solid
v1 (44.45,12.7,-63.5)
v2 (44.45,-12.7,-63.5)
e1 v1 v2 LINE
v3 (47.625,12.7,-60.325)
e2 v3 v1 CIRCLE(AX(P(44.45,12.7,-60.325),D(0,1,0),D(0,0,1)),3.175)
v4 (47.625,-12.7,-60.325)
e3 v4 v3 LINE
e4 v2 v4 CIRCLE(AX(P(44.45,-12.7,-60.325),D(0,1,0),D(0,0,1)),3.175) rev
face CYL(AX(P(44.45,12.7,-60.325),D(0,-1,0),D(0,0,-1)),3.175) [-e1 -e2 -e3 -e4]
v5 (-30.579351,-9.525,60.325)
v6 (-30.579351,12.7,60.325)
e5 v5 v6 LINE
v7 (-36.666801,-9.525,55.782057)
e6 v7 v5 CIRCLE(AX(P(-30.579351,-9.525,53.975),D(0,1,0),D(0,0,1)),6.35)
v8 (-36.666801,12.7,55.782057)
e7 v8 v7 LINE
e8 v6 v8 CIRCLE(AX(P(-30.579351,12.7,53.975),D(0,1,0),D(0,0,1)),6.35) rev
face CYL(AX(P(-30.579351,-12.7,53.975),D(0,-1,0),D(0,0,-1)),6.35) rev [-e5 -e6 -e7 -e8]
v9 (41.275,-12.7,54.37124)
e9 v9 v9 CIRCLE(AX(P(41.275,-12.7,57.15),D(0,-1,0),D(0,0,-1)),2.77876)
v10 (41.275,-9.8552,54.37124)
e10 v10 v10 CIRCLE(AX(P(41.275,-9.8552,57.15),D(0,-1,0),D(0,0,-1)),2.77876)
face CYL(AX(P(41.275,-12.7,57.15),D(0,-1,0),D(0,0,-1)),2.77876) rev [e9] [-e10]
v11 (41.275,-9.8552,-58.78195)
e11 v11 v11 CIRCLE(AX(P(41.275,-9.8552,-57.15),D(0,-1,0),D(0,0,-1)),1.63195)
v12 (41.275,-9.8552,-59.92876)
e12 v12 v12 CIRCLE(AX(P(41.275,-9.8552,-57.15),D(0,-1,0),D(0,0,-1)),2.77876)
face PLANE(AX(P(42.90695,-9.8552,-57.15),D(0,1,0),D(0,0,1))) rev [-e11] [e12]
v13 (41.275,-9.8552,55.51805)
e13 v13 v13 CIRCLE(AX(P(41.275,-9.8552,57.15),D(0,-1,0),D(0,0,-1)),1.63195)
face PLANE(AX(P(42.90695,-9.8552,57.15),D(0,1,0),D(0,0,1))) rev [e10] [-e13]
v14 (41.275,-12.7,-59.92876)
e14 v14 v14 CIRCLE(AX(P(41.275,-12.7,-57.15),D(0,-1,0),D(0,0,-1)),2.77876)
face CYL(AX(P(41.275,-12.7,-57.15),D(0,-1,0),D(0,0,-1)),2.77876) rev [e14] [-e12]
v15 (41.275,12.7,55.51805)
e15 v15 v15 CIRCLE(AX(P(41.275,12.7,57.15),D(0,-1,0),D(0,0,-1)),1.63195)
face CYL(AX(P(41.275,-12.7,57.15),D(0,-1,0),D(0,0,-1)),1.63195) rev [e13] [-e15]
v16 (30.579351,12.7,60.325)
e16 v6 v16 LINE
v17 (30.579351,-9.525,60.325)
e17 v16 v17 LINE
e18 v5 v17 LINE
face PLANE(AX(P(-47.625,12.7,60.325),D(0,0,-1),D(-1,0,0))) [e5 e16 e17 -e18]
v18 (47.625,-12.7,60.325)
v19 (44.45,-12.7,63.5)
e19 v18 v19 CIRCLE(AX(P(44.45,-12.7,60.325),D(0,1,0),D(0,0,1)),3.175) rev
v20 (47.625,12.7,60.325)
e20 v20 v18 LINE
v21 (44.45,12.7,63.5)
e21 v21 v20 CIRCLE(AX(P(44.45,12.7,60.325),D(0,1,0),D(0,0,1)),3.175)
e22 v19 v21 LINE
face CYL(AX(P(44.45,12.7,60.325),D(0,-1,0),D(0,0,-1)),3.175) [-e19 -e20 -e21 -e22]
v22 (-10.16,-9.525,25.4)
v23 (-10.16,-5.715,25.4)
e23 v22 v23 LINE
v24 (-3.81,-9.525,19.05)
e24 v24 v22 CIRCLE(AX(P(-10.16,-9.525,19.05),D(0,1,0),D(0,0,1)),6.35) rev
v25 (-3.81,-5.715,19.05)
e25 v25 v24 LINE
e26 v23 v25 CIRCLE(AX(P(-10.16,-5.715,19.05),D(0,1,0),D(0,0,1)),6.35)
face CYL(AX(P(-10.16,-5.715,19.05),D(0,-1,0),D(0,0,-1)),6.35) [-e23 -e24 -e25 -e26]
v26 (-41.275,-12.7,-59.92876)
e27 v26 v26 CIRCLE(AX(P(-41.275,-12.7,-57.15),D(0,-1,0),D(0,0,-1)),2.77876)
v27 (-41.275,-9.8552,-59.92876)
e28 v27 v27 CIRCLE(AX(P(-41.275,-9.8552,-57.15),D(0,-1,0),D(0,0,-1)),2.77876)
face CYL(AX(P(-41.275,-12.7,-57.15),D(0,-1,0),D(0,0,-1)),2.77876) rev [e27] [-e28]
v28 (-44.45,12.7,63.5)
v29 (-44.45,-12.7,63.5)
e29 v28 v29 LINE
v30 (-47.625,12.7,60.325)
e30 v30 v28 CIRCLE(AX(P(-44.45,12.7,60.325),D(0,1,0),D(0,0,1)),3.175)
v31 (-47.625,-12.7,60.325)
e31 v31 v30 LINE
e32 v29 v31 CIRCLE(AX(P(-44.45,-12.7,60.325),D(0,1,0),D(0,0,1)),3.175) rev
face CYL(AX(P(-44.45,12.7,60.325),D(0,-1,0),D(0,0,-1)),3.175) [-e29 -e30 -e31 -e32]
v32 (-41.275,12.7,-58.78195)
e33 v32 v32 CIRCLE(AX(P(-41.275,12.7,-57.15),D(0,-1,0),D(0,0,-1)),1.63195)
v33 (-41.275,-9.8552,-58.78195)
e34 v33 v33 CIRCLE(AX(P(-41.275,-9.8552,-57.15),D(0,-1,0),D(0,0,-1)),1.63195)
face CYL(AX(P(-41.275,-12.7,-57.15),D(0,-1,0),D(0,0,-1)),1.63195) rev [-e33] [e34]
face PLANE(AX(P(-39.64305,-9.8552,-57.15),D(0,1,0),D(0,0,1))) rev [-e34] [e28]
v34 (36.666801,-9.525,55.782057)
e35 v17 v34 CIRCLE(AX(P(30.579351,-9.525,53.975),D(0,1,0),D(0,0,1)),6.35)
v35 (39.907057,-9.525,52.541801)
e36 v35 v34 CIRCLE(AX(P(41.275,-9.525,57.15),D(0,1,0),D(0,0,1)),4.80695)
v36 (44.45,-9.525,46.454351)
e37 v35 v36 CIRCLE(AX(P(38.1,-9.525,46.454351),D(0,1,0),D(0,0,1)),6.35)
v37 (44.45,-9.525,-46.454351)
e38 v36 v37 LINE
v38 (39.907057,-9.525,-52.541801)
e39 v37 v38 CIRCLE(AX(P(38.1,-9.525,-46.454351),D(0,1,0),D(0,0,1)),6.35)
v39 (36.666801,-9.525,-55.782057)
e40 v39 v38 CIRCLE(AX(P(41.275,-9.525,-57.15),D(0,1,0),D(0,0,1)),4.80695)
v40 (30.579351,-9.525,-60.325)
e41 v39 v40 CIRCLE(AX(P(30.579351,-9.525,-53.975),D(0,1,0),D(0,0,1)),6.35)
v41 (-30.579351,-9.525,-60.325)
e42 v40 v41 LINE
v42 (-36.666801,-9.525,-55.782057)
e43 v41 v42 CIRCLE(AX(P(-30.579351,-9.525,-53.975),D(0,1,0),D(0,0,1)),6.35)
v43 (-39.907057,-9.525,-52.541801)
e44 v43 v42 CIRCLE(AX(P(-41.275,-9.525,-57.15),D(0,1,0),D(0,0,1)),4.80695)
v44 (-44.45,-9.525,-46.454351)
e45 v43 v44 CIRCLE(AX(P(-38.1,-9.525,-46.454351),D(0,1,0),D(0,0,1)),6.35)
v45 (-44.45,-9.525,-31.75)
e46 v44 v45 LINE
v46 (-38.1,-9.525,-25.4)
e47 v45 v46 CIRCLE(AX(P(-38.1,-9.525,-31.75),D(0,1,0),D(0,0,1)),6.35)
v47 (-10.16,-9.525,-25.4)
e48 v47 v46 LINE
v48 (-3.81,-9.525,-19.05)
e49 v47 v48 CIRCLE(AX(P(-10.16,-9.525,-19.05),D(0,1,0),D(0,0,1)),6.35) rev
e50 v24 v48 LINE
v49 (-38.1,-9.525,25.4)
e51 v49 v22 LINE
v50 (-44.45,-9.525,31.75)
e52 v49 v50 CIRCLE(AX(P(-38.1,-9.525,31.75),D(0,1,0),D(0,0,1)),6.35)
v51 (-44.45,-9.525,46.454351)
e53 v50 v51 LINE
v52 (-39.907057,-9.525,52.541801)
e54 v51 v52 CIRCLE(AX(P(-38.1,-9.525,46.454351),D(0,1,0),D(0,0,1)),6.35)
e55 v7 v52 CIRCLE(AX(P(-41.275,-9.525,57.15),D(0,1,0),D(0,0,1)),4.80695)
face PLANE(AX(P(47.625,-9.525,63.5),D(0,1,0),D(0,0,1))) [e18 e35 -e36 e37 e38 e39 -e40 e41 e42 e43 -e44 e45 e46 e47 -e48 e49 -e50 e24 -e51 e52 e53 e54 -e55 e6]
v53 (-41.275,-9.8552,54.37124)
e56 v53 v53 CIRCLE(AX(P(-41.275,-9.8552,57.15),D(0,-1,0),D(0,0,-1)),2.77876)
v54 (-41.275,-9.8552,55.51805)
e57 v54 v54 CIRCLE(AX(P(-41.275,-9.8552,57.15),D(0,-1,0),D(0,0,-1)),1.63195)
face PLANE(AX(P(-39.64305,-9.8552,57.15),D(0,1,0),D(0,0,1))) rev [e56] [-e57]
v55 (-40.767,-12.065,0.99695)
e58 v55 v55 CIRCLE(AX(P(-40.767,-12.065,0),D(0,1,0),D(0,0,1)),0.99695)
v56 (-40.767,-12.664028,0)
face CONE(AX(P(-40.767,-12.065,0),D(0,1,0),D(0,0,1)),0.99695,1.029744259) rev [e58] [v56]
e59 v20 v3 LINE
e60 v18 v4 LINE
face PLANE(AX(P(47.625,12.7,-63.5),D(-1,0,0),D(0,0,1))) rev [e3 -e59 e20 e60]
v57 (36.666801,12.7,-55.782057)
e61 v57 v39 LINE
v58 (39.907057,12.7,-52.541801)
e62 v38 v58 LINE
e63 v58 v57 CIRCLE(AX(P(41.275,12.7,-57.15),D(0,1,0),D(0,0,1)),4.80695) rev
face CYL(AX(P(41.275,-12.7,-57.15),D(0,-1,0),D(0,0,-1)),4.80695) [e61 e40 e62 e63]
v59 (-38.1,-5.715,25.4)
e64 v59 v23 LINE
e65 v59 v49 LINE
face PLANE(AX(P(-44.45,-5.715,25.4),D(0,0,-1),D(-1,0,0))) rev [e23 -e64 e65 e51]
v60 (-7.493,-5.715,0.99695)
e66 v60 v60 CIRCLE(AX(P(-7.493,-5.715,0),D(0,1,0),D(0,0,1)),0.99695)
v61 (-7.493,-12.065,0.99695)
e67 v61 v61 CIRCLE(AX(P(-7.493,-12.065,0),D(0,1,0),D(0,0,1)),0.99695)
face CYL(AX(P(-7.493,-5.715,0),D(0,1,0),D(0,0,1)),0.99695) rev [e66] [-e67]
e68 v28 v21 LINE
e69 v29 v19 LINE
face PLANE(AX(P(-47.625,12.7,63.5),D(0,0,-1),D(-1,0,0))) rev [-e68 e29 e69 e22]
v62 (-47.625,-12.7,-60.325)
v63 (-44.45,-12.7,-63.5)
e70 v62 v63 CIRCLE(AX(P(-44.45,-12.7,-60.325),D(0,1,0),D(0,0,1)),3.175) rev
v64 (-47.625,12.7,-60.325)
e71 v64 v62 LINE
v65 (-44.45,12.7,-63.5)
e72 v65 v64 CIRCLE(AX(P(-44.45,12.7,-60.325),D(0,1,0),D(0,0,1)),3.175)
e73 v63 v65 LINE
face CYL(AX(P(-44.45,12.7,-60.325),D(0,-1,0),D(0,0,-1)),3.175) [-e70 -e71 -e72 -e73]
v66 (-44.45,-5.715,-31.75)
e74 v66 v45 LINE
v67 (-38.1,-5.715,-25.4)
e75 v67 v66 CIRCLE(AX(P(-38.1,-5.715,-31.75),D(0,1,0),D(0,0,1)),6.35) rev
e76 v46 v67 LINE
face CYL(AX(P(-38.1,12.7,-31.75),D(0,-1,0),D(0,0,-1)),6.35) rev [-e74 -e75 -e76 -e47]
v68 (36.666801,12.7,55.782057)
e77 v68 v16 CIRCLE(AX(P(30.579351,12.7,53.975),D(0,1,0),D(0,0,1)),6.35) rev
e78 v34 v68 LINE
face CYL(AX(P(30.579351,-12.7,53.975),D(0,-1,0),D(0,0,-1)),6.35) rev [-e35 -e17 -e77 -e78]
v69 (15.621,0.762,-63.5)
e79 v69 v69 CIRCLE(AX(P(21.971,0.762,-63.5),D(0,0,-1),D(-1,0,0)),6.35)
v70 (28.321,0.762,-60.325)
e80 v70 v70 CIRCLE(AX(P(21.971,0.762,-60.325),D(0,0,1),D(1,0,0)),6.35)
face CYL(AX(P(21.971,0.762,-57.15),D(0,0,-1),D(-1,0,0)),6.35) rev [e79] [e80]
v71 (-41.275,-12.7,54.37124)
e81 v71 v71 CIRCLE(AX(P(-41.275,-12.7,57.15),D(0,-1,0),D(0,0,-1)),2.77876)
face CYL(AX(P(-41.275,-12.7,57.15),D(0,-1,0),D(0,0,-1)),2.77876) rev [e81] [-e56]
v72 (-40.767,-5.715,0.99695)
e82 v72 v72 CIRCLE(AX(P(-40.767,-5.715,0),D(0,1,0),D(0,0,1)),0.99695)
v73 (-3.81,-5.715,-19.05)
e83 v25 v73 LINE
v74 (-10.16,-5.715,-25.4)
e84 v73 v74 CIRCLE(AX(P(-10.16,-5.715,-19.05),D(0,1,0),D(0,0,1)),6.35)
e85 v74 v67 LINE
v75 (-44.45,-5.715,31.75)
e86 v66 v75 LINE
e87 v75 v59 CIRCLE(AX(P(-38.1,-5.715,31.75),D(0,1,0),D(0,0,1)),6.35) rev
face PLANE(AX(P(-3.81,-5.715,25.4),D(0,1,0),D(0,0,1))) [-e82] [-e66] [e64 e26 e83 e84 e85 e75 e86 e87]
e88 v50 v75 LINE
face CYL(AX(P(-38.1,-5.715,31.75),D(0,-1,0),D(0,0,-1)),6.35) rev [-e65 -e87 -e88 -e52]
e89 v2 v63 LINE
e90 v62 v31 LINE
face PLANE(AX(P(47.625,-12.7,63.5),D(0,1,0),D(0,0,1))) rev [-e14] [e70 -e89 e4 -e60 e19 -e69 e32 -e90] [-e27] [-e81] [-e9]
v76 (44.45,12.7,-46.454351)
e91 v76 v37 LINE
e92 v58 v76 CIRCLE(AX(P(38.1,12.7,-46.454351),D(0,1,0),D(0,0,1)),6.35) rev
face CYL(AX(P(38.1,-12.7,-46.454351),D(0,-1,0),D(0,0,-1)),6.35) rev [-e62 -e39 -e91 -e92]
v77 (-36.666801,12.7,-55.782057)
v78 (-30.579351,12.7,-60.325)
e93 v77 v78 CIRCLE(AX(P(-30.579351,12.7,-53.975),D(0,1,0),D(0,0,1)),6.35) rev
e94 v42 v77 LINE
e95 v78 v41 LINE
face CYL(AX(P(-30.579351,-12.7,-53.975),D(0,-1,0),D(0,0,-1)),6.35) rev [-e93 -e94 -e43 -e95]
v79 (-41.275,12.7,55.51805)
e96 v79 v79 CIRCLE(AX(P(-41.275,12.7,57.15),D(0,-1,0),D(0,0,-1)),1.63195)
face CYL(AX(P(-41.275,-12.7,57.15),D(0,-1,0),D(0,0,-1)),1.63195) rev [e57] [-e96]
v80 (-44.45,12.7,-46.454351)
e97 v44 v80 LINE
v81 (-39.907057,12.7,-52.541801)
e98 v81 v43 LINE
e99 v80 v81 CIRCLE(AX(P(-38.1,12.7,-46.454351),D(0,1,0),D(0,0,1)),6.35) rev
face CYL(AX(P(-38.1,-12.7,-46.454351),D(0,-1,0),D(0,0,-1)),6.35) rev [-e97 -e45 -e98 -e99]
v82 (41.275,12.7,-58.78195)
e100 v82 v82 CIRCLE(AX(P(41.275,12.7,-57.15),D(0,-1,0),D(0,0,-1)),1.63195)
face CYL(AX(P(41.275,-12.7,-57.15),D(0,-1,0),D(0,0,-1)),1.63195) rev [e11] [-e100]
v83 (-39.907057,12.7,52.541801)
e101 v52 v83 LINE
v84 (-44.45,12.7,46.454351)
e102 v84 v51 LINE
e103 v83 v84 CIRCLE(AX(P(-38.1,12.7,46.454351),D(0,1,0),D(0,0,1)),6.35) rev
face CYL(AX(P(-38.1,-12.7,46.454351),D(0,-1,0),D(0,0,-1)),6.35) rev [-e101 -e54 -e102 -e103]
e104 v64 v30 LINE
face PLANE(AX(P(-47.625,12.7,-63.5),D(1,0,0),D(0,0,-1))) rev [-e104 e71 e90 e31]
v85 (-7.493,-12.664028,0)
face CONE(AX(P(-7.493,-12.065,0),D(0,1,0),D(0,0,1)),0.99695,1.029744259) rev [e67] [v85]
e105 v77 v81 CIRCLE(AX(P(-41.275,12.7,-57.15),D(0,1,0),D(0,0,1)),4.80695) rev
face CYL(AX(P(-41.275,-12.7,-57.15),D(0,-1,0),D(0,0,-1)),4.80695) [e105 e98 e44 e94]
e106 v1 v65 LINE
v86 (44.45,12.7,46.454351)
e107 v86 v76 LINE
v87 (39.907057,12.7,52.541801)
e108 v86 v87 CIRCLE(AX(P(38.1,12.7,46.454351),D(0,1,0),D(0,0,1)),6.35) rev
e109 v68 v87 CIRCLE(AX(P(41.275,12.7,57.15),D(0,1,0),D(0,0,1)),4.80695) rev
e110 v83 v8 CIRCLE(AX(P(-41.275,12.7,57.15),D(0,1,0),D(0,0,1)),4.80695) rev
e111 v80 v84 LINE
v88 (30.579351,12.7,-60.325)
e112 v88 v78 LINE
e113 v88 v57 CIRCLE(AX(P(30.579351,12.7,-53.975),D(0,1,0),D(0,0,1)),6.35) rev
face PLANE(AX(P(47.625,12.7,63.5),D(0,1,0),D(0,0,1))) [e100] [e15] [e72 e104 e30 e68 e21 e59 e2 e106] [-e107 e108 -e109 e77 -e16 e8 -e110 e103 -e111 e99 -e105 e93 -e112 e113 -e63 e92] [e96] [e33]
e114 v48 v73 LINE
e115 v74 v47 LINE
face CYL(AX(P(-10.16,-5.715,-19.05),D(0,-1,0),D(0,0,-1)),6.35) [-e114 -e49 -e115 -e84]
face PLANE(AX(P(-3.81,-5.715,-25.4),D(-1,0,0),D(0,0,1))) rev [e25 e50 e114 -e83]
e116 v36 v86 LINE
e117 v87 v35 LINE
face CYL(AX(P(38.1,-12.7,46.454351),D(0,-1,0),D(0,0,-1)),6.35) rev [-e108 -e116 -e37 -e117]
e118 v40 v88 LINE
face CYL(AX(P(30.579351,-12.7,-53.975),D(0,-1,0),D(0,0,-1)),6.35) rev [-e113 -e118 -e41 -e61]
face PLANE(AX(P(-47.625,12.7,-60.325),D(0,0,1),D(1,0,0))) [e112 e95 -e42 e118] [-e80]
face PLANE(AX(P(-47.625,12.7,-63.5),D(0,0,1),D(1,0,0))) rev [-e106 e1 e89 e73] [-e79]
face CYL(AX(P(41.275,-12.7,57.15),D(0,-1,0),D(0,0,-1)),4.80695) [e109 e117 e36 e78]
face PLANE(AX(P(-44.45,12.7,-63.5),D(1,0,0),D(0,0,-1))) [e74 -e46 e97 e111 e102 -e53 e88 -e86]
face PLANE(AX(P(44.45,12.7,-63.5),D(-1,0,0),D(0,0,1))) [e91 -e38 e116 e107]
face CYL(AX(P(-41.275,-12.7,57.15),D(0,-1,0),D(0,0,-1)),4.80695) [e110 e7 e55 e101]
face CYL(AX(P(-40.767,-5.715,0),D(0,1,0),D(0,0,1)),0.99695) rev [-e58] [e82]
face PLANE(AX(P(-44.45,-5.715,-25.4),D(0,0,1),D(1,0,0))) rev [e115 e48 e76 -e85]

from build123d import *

# Parameters (mm, degrees)
SKETCH1_W                                      = 95.25
SKETCH1_H                                      = 127
BOSS_EXTRUDE1_DEPTH                            = 12.7
FILLET1_R                                      = 3.175
CBORE_FOR_4_SOCKET_HEAD_CAP_SCREW1_D           = 3.2639
CBORE_FOR_4_SOCKET_HEAD_CAP_SCREW1_CBORE_D     = 5.55752
CBORE_FOR_4_SOCKET_HEAD_CAP_SCREW1_CBORE_DEPTH = 2.8448
SHELL1_START                                   = -9.525
SHELL1_DEPTH                                   = 22.225
SHELL1_START_2                                 = -6.6802
SHELL1_2_DEPTH                                 = 19.3802
CUT_EXTRUDE1_START                             = -2.8448
CUT_EXTRUDE1_DEPTH                             = 2.8448
SKETCH7_W                                      = 40.64
SKETCH7_H                                      = 50.8
BOSS_EXTRUDE2_DEPTH                            = 3.81
F_3_48_TAPPED_HOLE1_D                          = 1.9939
F_3_48_TAPPED_HOLE1_DEPTH                      = 6.35
F_3_48_TAPPED_HOLE1_TIP                        = 0.599027994
FILLET4_R                                      = 6.35
FILLET5_R                                      = 6.35
SKETCH12_R                                     = 6.35
CUT_EXTRUDE2_DEPTH                             = 6.35


# Read off the part's stored shape, not the designer's step: Shell1
with BuildPart() as part:
    # Sketch1 → Boss-Extrude1 (new, symmetric)
    with BuildSketch(Plane(origin=(0, 0, 0), x_dir=(1, 0, 0), z_dir=(0, 1, 0))):
        Rectangle(SKETCH1_W, SKETCH1_H)
    extrude(amount=BOSS_EXTRUDE1_DEPTH, both=True)

    # Fillet1
    fillet1_edges = [part.edges().sort_by_distance(p)[0] for p in [
        (47.625, 0, 63.5),
        (-47.625, 0, 63.5),
        (-47.625, 0, -63.5),
        (47.625, 0, -63.5),
    ]]
    fillet(fillet1_edges, radius=FILLET1_R)

    # CBORE for #4 Socket Head Cap Screw1 (through all)
    with Locations(Plane.XZ.offset(12.7)):
        with Locations((-41.275, -57.15), (-41.275, 57.15), (41.275, 57.15), (41.275, -57.15)):
            CounterBoreHole(CBORE_FOR_4_SOCKET_HEAD_CAP_SCREW1_D / 2, CBORE_FOR_4_SOCKET_HEAD_CAP_SCREW1_CBORE_D / 2, CBORE_FOR_4_SOCKET_HEAD_CAP_SCREW1_CBORE_DEPTH)

    # Shell1 outline → Shell1 (cut)
    with BuildSketch(Plane(origin=(0, 0, 0), x_dir=(1, 0, 0), z_dir=(0, 1, 0)).offset(SHELL1_START)):
        with BuildLine():
            Line((36.238470129, 60.325), (-36.238470129, 60.325))
            ThreePointArc((-36.238470129, 60.325), (-37.06505593, 52.94005593), (-44.45, 52.113470129))
            Line((-44.45, 52.113470129), (-44.45, -52.113470129))
            ThreePointArc((-44.45, -52.113470129), (-37.06505593, -52.94005593), (-36.238470129, -60.325))
            Line((-36.238470129, -60.325), (36.238470129, -60.325))
            ThreePointArc((36.238470129, -60.325), (37.06505593, -52.94005593), (44.45, -52.113470129))
            Line((44.45, -52.113470129), (44.45, 52.113470129))
            ThreePointArc((44.45, 52.113470129), (37.06505593, 52.94005593), (36.238470129, 60.325))
        make_face()
    extrude(amount=SHELL1_DEPTH, mode=Mode.SUBTRACT)

    # Shell1 2 outline → Shell1 2 (cut)
    with BuildSketch(Plane(origin=(0, 0, 0), x_dir=(1, 0, 0), z_dir=(0, 1, 0)).offset(SHELL1_START_2)):
        with BuildLine():
            Line((-36.238470129, 60.325), (-37.665825122, 60.325))
            ThreePointArc((-37.665825122, 60.325), (-37.875973058, 53.750973058), (-44.45, 53.540825122))
            Line((-44.45, 53.540825122), (-44.45, 52.113470129))
            ThreePointArc((-44.45, 52.113470129), (-37.06505593, 52.94005593), (-36.238470129, 60.325))
        make_face()
        with BuildLine():
            Line((37.665825122, 60.325), (36.238470129, 60.325))
            ThreePointArc((36.238470129, 60.325), (37.06505593, 52.94005593), (44.45, 52.113470129))
            Line((44.45, 52.113470129), (44.45, 53.540825122))
            ThreePointArc((44.45, 53.540825122), (37.875973058, 53.750973058), (37.665825122, 60.325))
        make_face()
        with BuildLine():
            ThreePointArc((-36.238470129, -60.325), (-37.06505593, -52.94005593), (-44.45, -52.113470129))
            Line((-44.45, -52.113470129), (-44.45, -53.540825122))
            ThreePointArc((-44.45, -53.540825122), (-37.875973058, -53.750973058), (-37.665825122, -60.325))
            Line((-37.665825122, -60.325), (-36.238470129, -60.325))
        make_face()
        with BuildLine():
            Line((44.45, -53.540825122), (44.45, -52.113470129))
            ThreePointArc((44.45, -52.113470129), (37.06505593, -52.94005593), (36.238470129, -60.325))
            Line((36.238470129, -60.325), (37.665825122, -60.325))
            ThreePointArc((37.665825122, -60.325), (37.875973058, -53.750973058), (44.45, -53.540825122))
        make_face()
    extrude(amount=SHELL1_2_DEPTH, mode=Mode.SUBTRACT)

    # Sketch11 → Cut-Extrude1 (cut)
    with BuildSketch(Plane(origin=(0, -6.6802, 0), x_dir=(1, 0, 0), z_dir=(0, 1, 0)).offset(CUT_EXTRUDE1_START)):
        with BuildLine():
            Line((-44.45, 53.540825122), (-44.45, 52.113470129))
            ThreePointArc((-44.45, 52.113470129), (-37.06505593, 52.94005593), (-36.238470129, 60.325))
            Line((-36.238470129, 60.325), (-37.665825122, 60.325))
            ThreePointArc((-37.665825122, 60.325), (-37.875973058, 53.750973058), (-44.45, 53.540825122))
        make_face()
        with BuildLine():
            Line((44.45, 52.113470129), (44.45, 53.540825122))
            ThreePointArc((44.45, 53.540825122), (37.875973058, 53.750973058), (37.665825122, 60.325))
            Line((37.665825122, 60.325), (36.238470129, 60.325))
            ThreePointArc((36.238470129, 60.325), (37.06505593, 52.94005593), (44.45, 52.113470129))
        make_face()
        with BuildLine():
            Line((-44.45, -52.113470129), (-44.45, -53.540825122))
            ThreePointArc((-44.45, -53.540825122), (-37.875973058, -53.750973058), (-37.665825122, -60.325))
            Line((-37.665825122, -60.325), (-36.238470129, -60.325))
            ThreePointArc((-36.238470129, -60.325), (-37.06505593, -52.94005593), (-44.45, -52.113470129))
        make_face()
        with BuildLine():
            Line((36.238470129, -60.325), (37.665825122, -60.325))
            ThreePointArc((37.665825122, -60.325), (37.875973058, -53.750973058), (44.45, -53.540825122))
            Line((44.45, -53.540825122), (44.45, -52.113470129))
            ThreePointArc((44.45, -52.113470129), (37.06505593, -52.94005593), (36.238470129, -60.325))
        make_face()
    extrude(amount=CUT_EXTRUDE1_DEPTH, mode=Mode.SUBTRACT)

    # Sketch7 → Boss-Extrude2 (add)
    with BuildSketch(Plane(origin=(0, -9.525, 0), x_dir=(1, 0, 0), z_dir=(0, 1, 0))):
        with Locations((-24.13, 0)):
            Rectangle(SKETCH7_W, SKETCH7_H)
    extrude(amount=BOSS_EXTRUDE2_DEPTH)

    # #3-48 Tapped Hole1
    with Locations(Plane(origin=(0, -5.715, 0), x_dir=(-1, 0, 0), z_dir=(0, 1, 0))):
        with Locations((40.767, 0), (7.493, 0)):
            Hole(F_3_48_TAPPED_HOLE1_D / 2, depth=F_3_48_TAPPED_HOLE1_DEPTH)
            with Locations((0, 0, -(F_3_48_TAPPED_HOLE1_DEPTH + F_3_48_TAPPED_HOLE1_TIP / 2))):  # 118° drill point
                Cone(0, F_3_48_TAPPED_HOLE1_D / 2, F_3_48_TAPPED_HOLE1_TIP, mode=Mode.SUBTRACT)

    # Fillet4
    fillet4_edges = [part.edges().sort_by_distance(p)[0] for p in [
        (-3.81, -7.62, 25.4),
        (-3.81, -7.62, -25.4),
        (-44.45, -7.62, -25.4),
        (-44.45, -7.62, 25.4),
    ]]
    fillet(fillet4_edges, radius=FILLET4_R)

    # Fillet5
    fillet5_edges = [part.edges().sort_by_distance(p)[0] for p in [
        (37.665825122, 3.0099, -60.325),
        (44.45, 3.0099, 53.540825122),
        (-44.45, 3.0099, -53.540825122),
        (-37.665825122, 3.0099, 60.325),
        (44.45, 3.0099, -53.540825122),
        (37.665825122, 3.0099, 60.325),
        (-44.45, 3.0099, 53.540825122),
        (-37.665825122, 3.0099, -60.325),
    ]]
    fillet(fillet5_edges, radius=FILLET5_R)

    # Sketch12 → Cut-Extrude2 (cut)
    with BuildSketch(Plane(origin=(0, 0, -63.5), x_dir=(-1, 0, 0), z_dir=(0, 0, -1))):
        with Locations((-21.971, 0.762)):
            Circle(SKETCH12_R)
    extrude(amount=-CUT_EXTRUDE2_DEPTH, mode=Mode.SUBTRACT)


solid = part.part
